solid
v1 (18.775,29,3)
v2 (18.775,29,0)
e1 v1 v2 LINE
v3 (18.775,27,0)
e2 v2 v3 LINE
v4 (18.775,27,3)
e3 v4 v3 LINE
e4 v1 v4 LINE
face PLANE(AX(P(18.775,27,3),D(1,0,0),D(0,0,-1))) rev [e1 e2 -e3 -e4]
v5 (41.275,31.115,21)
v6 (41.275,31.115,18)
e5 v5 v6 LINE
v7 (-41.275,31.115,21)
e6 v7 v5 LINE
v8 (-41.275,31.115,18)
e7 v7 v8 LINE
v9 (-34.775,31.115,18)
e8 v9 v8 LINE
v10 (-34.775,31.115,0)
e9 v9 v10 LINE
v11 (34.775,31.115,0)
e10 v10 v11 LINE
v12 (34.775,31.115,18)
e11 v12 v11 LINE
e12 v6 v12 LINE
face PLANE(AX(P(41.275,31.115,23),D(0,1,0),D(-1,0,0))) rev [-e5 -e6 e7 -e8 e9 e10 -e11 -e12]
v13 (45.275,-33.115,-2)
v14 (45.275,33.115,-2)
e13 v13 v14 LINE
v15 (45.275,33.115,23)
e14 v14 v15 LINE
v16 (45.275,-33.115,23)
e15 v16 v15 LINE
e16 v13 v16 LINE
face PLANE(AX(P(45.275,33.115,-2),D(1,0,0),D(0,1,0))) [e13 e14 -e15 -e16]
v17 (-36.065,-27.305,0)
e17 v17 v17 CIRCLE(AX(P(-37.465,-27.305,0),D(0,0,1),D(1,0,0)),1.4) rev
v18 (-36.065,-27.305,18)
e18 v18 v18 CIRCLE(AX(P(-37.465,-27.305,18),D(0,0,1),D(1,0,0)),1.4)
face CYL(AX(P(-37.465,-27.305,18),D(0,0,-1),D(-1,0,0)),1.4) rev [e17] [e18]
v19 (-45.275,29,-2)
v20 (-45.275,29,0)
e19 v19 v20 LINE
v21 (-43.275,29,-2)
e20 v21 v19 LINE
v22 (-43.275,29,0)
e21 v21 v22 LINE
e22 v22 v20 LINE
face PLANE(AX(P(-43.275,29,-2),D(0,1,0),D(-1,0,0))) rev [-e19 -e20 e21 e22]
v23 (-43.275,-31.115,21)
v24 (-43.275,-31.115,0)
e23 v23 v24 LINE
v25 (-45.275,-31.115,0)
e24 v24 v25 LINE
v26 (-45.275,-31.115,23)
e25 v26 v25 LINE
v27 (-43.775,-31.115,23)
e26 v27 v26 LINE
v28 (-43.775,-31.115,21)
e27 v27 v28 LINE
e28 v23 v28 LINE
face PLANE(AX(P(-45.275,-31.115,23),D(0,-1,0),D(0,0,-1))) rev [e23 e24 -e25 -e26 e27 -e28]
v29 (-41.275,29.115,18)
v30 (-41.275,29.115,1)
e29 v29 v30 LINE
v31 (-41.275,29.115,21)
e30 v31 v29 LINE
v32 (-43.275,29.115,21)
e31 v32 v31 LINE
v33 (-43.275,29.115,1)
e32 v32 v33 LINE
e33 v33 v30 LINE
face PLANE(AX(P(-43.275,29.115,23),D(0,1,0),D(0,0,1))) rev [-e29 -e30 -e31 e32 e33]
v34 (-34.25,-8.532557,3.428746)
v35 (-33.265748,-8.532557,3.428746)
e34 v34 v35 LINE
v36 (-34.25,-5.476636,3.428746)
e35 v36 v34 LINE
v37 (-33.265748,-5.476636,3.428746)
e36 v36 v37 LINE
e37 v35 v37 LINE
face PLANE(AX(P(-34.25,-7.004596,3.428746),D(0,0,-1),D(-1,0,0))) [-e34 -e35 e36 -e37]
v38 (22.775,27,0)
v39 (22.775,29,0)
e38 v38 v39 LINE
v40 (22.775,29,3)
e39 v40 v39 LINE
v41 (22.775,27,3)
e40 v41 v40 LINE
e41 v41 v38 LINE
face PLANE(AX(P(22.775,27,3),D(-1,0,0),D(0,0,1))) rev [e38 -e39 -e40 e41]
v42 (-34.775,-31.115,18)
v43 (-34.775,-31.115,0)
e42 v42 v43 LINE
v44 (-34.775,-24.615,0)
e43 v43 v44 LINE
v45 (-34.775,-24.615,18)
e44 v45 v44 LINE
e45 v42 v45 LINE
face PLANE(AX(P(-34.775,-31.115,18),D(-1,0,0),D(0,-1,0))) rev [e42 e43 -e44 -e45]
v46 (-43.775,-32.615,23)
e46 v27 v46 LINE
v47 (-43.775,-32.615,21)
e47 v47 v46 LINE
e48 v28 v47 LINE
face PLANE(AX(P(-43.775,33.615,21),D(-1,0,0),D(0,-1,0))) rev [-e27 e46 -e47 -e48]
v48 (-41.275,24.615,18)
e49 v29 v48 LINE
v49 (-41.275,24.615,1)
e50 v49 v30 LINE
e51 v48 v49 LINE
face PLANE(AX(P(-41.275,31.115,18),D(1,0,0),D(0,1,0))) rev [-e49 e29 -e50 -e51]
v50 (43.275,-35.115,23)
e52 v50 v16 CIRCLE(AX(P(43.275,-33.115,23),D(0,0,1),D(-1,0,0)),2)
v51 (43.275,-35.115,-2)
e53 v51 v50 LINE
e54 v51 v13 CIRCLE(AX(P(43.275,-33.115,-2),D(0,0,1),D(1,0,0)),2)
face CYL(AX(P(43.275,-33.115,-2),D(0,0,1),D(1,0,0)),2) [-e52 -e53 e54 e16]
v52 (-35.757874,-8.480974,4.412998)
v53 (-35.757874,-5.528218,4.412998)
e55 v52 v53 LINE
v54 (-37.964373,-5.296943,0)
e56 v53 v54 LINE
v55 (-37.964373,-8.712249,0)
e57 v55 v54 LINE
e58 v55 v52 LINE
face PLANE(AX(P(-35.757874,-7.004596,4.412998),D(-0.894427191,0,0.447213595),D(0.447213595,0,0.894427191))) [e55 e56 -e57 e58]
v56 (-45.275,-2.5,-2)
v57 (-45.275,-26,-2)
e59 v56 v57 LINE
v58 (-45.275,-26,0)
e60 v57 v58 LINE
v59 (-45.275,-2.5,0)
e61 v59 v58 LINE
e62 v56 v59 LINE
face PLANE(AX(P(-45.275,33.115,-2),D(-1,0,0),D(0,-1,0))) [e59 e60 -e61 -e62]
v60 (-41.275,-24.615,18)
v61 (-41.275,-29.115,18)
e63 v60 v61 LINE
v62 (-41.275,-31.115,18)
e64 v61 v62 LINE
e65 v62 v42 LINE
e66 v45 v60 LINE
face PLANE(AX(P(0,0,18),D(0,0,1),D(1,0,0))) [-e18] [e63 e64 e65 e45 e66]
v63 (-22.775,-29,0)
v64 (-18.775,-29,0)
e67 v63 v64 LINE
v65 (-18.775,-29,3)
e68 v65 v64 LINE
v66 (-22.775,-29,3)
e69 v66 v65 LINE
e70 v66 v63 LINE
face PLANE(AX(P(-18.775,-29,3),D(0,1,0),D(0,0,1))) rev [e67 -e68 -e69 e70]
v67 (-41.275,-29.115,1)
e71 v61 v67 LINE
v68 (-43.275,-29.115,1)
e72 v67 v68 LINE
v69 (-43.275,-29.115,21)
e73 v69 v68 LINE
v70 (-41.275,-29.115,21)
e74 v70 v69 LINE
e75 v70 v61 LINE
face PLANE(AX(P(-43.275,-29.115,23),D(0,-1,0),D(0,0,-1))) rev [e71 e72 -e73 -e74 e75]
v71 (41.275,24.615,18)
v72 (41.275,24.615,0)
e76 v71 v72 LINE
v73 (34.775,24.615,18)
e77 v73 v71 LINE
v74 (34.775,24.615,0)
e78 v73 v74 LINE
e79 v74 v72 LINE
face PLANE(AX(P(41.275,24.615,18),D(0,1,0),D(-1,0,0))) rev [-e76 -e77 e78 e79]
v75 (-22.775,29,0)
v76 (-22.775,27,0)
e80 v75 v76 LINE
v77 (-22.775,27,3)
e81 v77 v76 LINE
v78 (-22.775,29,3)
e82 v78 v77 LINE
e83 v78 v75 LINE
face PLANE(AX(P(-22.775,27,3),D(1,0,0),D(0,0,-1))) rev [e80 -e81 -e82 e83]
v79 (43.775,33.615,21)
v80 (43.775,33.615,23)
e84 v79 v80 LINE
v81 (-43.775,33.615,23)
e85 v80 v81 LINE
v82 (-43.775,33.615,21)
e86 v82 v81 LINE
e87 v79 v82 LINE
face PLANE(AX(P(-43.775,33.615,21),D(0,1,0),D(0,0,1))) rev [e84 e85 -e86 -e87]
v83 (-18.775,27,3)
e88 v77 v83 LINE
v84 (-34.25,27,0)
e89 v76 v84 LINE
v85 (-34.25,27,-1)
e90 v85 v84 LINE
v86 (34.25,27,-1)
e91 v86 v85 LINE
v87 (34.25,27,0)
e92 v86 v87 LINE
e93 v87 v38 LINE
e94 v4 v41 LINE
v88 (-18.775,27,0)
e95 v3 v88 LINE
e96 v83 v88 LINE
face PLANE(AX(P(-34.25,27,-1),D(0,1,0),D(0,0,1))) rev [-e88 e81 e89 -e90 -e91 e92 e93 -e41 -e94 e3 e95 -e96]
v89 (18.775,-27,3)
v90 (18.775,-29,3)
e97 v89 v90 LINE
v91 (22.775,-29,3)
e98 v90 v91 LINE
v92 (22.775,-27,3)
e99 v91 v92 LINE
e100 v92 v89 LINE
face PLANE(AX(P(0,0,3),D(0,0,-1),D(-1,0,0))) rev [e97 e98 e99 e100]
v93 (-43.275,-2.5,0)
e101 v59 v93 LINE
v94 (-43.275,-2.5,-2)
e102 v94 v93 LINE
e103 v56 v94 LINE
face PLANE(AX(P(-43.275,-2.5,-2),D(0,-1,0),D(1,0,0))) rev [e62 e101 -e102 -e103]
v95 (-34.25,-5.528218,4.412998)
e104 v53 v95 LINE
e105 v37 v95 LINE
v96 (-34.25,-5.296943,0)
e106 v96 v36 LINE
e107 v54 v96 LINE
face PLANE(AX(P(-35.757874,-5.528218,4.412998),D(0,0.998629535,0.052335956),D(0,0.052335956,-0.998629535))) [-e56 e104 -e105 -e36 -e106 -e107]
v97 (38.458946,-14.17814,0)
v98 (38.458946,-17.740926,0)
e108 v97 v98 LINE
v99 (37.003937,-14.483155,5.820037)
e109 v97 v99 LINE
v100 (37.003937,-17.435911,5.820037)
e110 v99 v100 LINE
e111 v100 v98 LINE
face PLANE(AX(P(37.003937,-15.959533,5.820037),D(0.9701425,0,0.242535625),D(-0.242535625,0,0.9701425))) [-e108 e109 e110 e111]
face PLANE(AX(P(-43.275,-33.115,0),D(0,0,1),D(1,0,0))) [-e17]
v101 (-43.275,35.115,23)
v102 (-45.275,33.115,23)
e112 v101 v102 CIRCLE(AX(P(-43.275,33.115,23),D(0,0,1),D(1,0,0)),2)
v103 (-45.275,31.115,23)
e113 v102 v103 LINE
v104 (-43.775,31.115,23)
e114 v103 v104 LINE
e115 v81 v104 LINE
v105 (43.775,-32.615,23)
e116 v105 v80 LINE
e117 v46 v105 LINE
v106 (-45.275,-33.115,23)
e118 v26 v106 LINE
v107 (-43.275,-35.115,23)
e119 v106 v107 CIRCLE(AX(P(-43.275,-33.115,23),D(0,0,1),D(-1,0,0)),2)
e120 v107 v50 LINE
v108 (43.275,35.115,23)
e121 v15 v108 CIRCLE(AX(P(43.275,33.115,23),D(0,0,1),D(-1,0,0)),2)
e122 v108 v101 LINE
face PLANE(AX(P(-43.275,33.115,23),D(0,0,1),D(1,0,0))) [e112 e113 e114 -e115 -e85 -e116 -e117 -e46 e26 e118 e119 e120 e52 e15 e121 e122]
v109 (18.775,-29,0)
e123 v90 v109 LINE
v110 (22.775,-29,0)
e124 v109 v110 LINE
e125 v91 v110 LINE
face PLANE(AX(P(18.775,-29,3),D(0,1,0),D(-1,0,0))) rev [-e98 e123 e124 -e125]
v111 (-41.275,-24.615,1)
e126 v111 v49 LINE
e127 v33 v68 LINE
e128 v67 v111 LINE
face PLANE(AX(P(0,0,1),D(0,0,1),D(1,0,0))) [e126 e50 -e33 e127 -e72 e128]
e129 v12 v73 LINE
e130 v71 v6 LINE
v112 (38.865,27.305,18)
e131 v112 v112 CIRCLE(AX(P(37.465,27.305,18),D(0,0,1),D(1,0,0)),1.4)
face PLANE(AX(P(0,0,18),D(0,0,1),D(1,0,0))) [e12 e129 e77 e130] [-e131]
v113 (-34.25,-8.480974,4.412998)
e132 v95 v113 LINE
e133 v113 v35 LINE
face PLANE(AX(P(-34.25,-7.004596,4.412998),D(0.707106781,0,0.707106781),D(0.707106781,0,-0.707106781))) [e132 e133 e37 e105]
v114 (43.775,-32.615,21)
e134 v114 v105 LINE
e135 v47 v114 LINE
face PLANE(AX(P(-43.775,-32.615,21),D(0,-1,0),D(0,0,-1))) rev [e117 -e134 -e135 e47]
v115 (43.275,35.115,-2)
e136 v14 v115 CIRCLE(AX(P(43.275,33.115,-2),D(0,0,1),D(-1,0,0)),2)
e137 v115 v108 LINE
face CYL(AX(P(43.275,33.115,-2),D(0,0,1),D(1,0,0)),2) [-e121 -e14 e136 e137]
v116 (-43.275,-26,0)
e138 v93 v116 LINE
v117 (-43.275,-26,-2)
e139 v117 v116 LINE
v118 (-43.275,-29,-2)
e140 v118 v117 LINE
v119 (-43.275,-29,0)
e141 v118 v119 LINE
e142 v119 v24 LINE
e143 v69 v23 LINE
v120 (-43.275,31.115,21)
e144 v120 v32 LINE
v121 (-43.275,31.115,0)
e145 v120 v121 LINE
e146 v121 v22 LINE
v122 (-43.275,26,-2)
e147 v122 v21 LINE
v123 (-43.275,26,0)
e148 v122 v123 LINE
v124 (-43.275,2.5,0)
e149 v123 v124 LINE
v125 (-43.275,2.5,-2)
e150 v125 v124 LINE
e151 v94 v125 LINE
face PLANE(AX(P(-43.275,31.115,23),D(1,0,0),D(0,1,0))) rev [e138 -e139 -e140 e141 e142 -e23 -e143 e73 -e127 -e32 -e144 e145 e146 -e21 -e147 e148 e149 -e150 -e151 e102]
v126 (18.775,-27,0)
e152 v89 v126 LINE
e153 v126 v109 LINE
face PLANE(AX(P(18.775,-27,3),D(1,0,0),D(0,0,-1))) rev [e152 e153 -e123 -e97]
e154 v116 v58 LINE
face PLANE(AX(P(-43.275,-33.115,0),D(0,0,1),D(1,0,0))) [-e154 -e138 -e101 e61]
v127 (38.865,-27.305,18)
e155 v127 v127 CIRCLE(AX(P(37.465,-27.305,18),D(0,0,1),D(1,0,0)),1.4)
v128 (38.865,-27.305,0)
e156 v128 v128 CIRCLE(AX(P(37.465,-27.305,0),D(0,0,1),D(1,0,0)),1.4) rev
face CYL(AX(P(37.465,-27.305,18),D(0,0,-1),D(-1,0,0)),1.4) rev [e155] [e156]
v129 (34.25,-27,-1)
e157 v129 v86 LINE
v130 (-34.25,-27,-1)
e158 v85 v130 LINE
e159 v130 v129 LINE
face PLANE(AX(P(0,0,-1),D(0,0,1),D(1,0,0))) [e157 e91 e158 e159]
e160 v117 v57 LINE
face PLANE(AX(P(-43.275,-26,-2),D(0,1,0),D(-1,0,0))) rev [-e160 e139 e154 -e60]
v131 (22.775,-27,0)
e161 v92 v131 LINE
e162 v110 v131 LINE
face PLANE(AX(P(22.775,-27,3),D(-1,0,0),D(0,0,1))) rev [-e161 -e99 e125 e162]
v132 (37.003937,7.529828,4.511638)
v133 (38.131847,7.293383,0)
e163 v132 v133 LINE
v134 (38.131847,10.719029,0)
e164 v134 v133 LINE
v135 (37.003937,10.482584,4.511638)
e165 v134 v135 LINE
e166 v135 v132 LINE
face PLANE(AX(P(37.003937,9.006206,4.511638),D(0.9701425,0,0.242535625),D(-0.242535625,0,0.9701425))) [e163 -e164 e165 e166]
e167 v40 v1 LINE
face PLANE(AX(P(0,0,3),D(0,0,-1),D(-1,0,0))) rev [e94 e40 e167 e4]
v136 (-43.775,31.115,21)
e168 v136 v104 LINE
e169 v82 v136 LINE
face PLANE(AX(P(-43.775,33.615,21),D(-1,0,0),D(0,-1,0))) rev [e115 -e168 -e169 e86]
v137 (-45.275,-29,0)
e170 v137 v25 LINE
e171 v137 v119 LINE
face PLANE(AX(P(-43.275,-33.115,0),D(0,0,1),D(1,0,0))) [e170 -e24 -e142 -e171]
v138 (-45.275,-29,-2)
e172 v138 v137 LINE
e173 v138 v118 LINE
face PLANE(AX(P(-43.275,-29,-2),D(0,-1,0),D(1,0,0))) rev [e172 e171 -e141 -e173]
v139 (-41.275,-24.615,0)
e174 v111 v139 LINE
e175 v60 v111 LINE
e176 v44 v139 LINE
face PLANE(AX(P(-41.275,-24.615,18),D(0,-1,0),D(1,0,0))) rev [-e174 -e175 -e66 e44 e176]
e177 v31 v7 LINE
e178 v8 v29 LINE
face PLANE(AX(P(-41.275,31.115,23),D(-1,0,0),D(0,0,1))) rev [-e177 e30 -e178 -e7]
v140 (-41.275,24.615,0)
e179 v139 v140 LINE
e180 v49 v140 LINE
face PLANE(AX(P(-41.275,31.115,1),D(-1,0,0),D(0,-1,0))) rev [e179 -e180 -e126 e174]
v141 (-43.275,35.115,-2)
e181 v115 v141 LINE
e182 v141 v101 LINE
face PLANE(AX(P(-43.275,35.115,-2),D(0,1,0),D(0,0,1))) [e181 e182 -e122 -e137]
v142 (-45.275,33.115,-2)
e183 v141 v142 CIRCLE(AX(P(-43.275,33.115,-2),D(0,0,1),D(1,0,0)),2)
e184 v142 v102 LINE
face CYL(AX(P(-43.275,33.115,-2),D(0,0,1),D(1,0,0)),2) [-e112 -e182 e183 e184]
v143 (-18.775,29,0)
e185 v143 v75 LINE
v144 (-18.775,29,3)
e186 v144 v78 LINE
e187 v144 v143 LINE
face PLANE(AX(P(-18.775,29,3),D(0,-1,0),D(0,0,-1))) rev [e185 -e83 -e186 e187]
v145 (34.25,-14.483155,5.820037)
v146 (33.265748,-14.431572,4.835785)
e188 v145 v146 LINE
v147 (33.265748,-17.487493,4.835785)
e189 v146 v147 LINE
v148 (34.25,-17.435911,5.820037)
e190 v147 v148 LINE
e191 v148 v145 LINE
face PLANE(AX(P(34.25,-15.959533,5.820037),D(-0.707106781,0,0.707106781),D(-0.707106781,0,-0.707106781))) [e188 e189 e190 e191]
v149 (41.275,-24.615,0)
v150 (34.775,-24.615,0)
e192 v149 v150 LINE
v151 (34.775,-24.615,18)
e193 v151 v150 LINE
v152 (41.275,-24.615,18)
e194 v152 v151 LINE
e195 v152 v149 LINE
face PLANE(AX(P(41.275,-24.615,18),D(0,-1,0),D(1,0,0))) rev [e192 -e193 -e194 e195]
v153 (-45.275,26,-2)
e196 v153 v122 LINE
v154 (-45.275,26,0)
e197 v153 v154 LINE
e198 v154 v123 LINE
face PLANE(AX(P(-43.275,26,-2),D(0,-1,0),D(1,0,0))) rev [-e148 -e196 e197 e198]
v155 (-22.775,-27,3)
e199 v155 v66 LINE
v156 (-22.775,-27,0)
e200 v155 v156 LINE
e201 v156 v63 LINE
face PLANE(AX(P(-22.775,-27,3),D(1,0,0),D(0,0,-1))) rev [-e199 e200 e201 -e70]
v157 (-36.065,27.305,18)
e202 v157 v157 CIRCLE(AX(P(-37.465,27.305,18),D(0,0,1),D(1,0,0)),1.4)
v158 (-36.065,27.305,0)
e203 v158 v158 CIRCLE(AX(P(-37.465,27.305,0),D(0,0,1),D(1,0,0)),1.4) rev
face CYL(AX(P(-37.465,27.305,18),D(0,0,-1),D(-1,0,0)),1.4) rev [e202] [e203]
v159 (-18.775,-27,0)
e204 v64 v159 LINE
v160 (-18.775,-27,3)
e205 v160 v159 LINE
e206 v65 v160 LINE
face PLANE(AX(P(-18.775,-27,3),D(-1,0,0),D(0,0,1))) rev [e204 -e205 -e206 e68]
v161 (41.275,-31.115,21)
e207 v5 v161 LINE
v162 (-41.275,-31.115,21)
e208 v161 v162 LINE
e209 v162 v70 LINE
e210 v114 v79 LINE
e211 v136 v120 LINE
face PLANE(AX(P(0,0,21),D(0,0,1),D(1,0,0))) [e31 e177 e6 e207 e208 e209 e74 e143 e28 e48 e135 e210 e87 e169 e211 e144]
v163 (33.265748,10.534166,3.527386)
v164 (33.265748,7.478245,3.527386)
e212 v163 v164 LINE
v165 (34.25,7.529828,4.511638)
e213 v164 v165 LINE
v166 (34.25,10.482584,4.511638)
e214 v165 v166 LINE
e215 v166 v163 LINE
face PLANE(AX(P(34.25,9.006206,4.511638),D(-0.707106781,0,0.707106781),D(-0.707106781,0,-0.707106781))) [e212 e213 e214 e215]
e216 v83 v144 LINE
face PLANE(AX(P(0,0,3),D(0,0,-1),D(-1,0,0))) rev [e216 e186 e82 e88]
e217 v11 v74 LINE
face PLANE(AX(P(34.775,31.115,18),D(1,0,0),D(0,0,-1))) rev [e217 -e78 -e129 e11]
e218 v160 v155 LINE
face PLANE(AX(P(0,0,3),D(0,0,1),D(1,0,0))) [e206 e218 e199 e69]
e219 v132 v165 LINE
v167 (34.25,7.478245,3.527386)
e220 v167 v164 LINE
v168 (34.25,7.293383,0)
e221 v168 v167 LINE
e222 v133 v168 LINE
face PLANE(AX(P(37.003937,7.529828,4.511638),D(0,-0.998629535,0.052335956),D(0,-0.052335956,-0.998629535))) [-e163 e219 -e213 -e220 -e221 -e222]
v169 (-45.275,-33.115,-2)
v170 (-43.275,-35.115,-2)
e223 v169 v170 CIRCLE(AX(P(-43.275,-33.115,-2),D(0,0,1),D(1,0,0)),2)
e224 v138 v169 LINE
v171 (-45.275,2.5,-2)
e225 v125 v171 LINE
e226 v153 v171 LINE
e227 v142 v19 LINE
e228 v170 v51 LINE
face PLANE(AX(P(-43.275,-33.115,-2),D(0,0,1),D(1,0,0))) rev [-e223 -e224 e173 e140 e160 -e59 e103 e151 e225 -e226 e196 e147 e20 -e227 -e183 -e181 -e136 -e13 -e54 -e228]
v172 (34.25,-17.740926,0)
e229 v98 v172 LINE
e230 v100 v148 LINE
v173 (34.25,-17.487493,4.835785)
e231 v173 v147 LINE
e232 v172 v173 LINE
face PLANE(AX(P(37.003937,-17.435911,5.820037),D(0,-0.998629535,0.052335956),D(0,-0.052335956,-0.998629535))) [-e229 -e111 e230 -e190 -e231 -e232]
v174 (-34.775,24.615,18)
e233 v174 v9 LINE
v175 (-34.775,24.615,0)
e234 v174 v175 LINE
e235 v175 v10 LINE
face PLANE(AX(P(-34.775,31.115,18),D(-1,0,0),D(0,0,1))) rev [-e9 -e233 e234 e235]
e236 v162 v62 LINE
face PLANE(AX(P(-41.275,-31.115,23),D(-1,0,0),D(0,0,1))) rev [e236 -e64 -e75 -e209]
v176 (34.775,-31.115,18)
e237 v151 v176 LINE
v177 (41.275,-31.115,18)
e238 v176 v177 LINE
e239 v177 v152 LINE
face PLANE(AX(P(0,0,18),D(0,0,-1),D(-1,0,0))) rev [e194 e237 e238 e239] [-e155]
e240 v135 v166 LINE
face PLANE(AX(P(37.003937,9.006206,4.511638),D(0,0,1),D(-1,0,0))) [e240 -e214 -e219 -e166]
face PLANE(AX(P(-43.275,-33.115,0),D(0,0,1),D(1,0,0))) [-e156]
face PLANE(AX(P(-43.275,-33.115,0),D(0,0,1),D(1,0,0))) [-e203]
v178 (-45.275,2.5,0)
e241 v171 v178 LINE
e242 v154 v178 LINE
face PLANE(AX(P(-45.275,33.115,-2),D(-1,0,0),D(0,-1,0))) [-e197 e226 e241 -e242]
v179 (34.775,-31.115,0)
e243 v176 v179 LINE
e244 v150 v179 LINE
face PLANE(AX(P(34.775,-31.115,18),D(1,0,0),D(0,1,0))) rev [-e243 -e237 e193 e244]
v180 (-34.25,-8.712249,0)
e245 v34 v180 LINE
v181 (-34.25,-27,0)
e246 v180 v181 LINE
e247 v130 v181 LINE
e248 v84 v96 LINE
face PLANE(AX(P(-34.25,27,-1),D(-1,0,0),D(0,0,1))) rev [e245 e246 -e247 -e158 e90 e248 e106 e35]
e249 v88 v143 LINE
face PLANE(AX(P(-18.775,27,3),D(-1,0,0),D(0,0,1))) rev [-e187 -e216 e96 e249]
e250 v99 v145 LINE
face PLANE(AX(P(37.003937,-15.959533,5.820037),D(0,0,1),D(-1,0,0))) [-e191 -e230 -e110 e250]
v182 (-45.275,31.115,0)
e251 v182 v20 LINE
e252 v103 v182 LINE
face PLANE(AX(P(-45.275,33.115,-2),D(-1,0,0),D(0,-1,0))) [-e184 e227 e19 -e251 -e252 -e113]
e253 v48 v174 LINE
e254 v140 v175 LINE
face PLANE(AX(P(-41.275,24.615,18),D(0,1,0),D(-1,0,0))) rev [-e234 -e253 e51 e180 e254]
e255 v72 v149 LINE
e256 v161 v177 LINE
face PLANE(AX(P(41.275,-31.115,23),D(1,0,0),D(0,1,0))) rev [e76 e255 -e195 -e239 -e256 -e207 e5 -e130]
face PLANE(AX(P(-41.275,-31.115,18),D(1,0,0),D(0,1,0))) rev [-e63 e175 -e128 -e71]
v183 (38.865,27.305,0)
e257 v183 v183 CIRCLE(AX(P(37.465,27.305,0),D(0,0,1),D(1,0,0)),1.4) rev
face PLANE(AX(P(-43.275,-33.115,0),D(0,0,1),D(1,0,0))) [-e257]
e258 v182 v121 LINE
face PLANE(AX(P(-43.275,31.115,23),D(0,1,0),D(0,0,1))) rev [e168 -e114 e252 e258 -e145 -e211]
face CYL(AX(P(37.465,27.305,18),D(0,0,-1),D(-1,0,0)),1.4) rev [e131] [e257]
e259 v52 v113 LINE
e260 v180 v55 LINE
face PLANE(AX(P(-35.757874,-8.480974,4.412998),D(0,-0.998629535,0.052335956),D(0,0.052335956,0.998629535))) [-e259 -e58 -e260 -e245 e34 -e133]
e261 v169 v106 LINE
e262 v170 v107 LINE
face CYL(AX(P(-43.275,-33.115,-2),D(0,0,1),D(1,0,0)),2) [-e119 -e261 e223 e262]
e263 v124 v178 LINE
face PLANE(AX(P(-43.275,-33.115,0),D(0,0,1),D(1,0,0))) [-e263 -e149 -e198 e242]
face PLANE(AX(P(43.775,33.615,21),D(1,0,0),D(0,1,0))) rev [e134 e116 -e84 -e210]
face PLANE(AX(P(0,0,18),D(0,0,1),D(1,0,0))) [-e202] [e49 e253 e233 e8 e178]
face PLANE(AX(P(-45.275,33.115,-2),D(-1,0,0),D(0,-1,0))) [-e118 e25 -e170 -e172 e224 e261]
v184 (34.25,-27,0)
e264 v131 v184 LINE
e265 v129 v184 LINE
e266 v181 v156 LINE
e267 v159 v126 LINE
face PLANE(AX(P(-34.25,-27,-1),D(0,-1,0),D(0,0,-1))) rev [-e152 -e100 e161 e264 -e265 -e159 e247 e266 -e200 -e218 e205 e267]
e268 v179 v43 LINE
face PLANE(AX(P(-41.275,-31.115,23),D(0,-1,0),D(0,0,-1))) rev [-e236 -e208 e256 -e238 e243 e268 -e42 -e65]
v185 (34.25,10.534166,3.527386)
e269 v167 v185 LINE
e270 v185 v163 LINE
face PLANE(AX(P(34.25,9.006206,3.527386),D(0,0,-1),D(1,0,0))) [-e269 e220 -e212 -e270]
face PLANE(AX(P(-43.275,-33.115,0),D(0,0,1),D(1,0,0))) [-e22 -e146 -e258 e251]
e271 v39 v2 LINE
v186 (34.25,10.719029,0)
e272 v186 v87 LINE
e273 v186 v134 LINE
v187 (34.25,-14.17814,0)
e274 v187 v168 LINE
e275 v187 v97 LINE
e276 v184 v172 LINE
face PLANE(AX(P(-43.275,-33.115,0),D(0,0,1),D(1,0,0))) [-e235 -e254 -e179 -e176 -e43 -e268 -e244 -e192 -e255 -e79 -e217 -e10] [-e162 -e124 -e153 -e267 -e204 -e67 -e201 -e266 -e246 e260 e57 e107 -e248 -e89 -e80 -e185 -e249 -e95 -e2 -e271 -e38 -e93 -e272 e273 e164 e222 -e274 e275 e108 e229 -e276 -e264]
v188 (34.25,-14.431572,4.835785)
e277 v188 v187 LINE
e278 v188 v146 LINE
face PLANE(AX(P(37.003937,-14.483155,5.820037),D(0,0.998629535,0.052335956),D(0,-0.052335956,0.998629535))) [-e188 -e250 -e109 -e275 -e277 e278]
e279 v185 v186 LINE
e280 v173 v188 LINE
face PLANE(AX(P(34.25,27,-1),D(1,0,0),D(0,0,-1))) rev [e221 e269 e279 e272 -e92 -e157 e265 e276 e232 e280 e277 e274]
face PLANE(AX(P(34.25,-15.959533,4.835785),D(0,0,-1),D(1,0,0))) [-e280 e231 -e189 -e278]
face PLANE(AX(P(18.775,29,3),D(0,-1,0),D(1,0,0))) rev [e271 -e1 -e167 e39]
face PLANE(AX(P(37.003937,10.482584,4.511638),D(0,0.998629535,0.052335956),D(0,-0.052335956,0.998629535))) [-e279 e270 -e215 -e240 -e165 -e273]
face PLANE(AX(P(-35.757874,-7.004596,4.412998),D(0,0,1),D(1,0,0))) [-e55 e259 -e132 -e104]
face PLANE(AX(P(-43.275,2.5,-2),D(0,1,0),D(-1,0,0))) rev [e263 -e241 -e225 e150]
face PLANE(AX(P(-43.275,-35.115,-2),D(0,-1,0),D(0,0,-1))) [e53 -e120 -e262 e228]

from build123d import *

# Parameters (mm, degrees)
BOSS_EXTRUDE1_DEPTH = 2
SKETCH2_W           = 6.5
SKETCH2_H           = 6.5
SKETCH2_R           = 1.4
BOSS_EXTRUDE2_DEPTH = 18
SKETCH3_W           = 68.5
SKETCH3_H           = 54
CUT_EXTRUDE1_DEPTH  = 1
SNAP_START          = 34.25
SNAP_HOOK1_DEPTH    = 2.753937008
SNAP_START_2        = 7.4782452
SNAP_HOOK1_2_DEPTH  = 3.055920826
SNAP_START_3        = 7.293382709
SNAP_HOOK1_3_DEPTH  = 3.425645808
SNAP_START_4        = 32
SNAP_HOOK1_4_DEPTH  = 7
LPATTERN1_START     = 34.25
LPATTERN1_DEPTH     = 2.753937008
LPATTERN1_START_2   = -17.740925941
LPATTERN1_2_DEPTH   = 3.56278637
LPATTERN1_START_3   = -17.487493169
LPATTERN1_3_DEPTH   = 3.055920826
LPATTERN1_START_4   = 32
LPATTERN1_4_DEPTH   = 7
SNAP_START_5        = -35.757874016
SNAP_HOOK2_DEPTH    = 1.507874016
SNAP_START_6        = -8.712249477
SNAP_HOOK2_2_DEPTH  = 3.415306745
SNAP_START_7        = -8.532556518
SNAP_HOOK2_3_DEPTH  = 3.055920826
SNAP_START_8        = -39
SNAP_HOOK2_4_DEPTH  = 7
BOSS_EXTRUDE3_START = 23
BOSS_EXTRUDE3_DEPTH = 23
SKETCH5_W           = 87.55
SKETCH5_H           = 66.23
CUT_EXTRUDE2_DEPTH  = 2
SKETCH6_W           = 2
SKETCH6_H           = 62.23
BOSS_EXTRUDE4_DEPTH = 1
SKETCH7_W           = 2
SKETCH7_H           = 3
SKETCH7_H_2         = 5
CUT_EXTRUDE3_DEPTH  = 2
SKETCH9_W           = 4
SKETCH9_H           = 2
BOSS_EXTRUDE6_DEPTH = 3


with BuildPart() as part:
    # Sketch1 → Boss-Extrude1 (new body)
    with BuildSketch(Plane.XY):
        with BuildLine():
            Line((-43.275, 35.115), (43.275, 35.115))
            ThreePointArc((43.275, 35.115), (44.689213562, 34.529213562), (45.275, 33.115))
            Line((45.275, 33.115), (45.275, -33.115))
            ThreePointArc((45.275, -33.115), (44.689213562, -34.529213562), (43.275, -35.115))
            Line((43.275, -35.115), (-43.275, -35.115))
            ThreePointArc((-43.275, -35.115), (-44.689213562, -34.529213562), (-45.275, -33.115))
            Line((-45.275, -33.115), (-45.275, 33.115))
            ThreePointArc((-45.275, 33.115), (-44.689213562, 34.529213562), (-43.275, 35.115))
        make_face()
    extrude(amount=-BOSS_EXTRUDE1_DEPTH)

    # Sketch2 → Boss-Extrude2 (add)
    # profile 1 of 4: a face of its own
    with BuildSketch(Plane.XY):
        with Locations((-38.025, -27.865)):
            Rectangle(SKETCH2_W, SKETCH2_H)
        with Locations((-37.465, -27.305)):
            Circle(SKETCH2_R, mode=Mode.SUBTRACT)
    # profile 2 of 4: a face of its own
    with BuildSketch(Plane.XY):
        with Locations((-38.025, 27.865)):
            Rectangle(SKETCH2_W, SKETCH2_H)
        with Locations((-37.465, 27.305)):
            Circle(SKETCH2_R, mode=Mode.SUBTRACT)
    # profile 3 of 4: a face of its own
    with BuildSketch(Plane.XY):
        with Locations((38.025, -27.865)):
            Rectangle(SKETCH2_W, SKETCH2_H)
        with Locations((37.465, -27.305)):
            Circle(SKETCH2_R, mode=Mode.SUBTRACT)
    # profile 4 of 4: a face of its own
    with BuildSketch(Plane.XY):
        with Locations((38.025, 27.865)):
            Rectangle(SKETCH2_W, SKETCH2_H)
        with Locations((37.465, 27.305)):
            Circle(SKETCH2_R, mode=Mode.SUBTRACT)
    extrude(amount=BOSS_EXTRUDE2_DEPTH)

    # Sketch3 → Cut-Extrude1 (cut)
    with BuildSketch(Plane.XY):
        Rectangle(SKETCH3_W, SKETCH3_H)
    extrude(amount=-CUT_EXTRUDE1_DEPTH, mode=Mode.SUBTRACT)

    # Snap Hook1: read off the stored shape, not the designer's step
    # Snap Hook1 outline → Snap Hook1 (add)
    with BuildSketch(Plane.YZ.offset(SNAP_START)):
        Polygon((10.482583566, 4.511638427), (7.52982766, 4.511638427), (7.293382709, 0), (10.719028517, 0), align=None)
    extrude(amount=SNAP_HOOK1_DEPTH)

    # Snap Hook1 2 outline → Snap Hook1 2 (add)
    with BuildSketch(Plane(origin=(0, 0, 0), x_dir=(1, 0, 0), z_dir=(0, 1, 0)).offset(SNAP_START_2)):
        Polygon((34.25, -3.527386458), (33.265748031, -3.527386458), (34.25, -4.511638427), align=None)
        Polygon((38.131846615, 0), (37.003937008, 0), (37.003937008, -4.511638427), align=None)
    extrude(amount=SNAP_HOOK1_2_DEPTH)

    # Snap Hook1 3 outline → Snap Hook1 3 (add)
    with BuildSketch(Plane(origin=(0, 0, 0), x_dir=(1, 0, 0), z_dir=(0, 1, 0)).offset(SNAP_START_3)):
        Polygon((38.131846615, 0), (37.003937008, 0), (37.003937008, -4.511638427), align=None)
    extrude(amount=SNAP_HOOK1_3_DEPTH)

    # Snap Hook1 4 outline → Snap Hook1 4 (cut)
    with BuildSketch(Plane.YZ.offset(SNAP_START_4)):
        Polygon((10.719028517, 0), (10.719028517, 6), (10.404581841, 6), (10.482583566, 4.511638427), align=None)
        Polygon((7.52982766, 4.511638427), (7.607829385, 6), (7.293382709, 6), (7.293382709, 0), align=None)
    extrude(amount=SNAP_HOOK1_4_DEPTH, mode=Mode.SUBTRACT)

    # LPattern1: read off the stored shape, not the designer's step
    # LPattern1 outline → LPattern1 (add)
    with BuildSketch(Plane.YZ.offset(LPATTERN1_START)):
        Polygon((-14.483154803, 5.820037333), (-17.435910709, 5.820037333), (-17.740925941, 0), (-14.178139571, 0), align=None)
    extrude(amount=LPATTERN1_DEPTH)

    # LPattern1 2 outline → LPattern1 2 (add)
    with BuildSketch(Plane(origin=(0, 0, 0), x_dir=(1, 0, 0), z_dir=(0, 1, 0)).offset(LPATTERN1_START_2)):
        Polygon((38.458946341, 0), (37.003937008, 0), (37.003937008, -5.820037333), align=None)
    extrude(amount=LPATTERN1_2_DEPTH)

    # LPattern1 3 outline → LPattern1 3 (add)
    with BuildSketch(Plane(origin=(0, 0, 0), x_dir=(1, 0, 0), z_dir=(0, 1, 0)).offset(LPATTERN1_START_3)):
        Polygon((34.25, -4.835785364), (33.265748031, -4.835785364), (34.25, -5.820037333), align=None)
    extrude(amount=LPATTERN1_3_DEPTH)

    # LPattern1 4 outline → LPattern1 4 (cut)
    with BuildSketch(Plane.YZ.offset(LPATTERN1_START_4)):
        Polygon((-14.178139571, 0), (-14.178139571, 7), (-14.544994026, 7), (-14.483154803, 5.820037333), align=None)
        Polygon((-17.435910709, 5.820037333), (-17.374071486, 7), (-17.740925941, 7), (-17.740925941, 0), align=None)
    extrude(amount=LPATTERN1_4_DEPTH, mode=Mode.SUBTRACT)

    # Snap Hook2: read off the stored shape, not the designer's step
    # Snap Hook2 outline → Snap Hook2 (add)
    with BuildSketch(Plane.YZ.offset(SNAP_START_5)):
        Polygon((-5.528218152, 4.412997898), (-8.480974058, 4.412997898), (-8.712249477, 0), (-5.296942732, 0), align=None)
    extrude(amount=SNAP_HOOK2_DEPTH)

    # Snap Hook2 2 outline → Snap Hook2 2 (add)
    with BuildSketch(Plane(origin=(0, 0, 0), x_dir=(1, 0, 0), z_dir=(0, 1, 0)).offset(SNAP_START_6)):
        Polygon((-35.757874016, -4.412997898), (-35.757874016, 0), (-37.964372965, 0), align=None)
    extrude(amount=SNAP_HOOK2_2_DEPTH)

    # Snap Hook2 3 outline → Snap Hook2 3 (add)
    with BuildSketch(Plane(origin=(0, 0, 0), x_dir=(1, 0, 0), z_dir=(0, 1, 0)).offset(SNAP_START_7)):
        Polygon((-34.25, -3.428745929), (-34.25, -4.412997898), (-33.265748031, -3.428745929), align=None)
    extrude(amount=SNAP_HOOK2_3_DEPTH)

    # Snap Hook2 4 outline → Snap Hook2 4 (cut)
    with BuildSketch(Plane.YZ.offset(SNAP_START_8)):
        Polygon((-8.480974058, 4.412997898), (-8.397802802, 6), (-8.712249477, 6), (-8.712249477, 0), align=None)
        Polygon((-5.611389408, 6), (-5.528218152, 4.412997898), (-5.296942732, 0), (-5.296942732, 6), align=None)
    extrude(amount=SNAP_HOOK2_4_DEPTH, mode=Mode.SUBTRACT)

    # Sketch4 → Boss-Extrude3 (add)
    with BuildSketch(Plane.XY.offset(BOSS_EXTRUDE3_START)):
        with BuildLine():
            Line((-43.275, 35.115), (43.275, 35.115))
            ThreePointArc((43.275, 35.115), (44.689213562, 34.529213562), (45.275, 33.115))
            Line((45.275, 33.115), (45.275, -33.115))
            ThreePointArc((45.275, -33.115), (44.689213562, -34.529213562), (43.275, -35.115))
            Line((43.275, -35.115), (-43.275, -35.115))
            ThreePointArc((-43.275, -35.115), (-44.689213562, -34.529213562), (-45.275, -33.115))
            Line((-45.275, -33.115), (-45.275, -31.115))
            Line((-45.275, -31.115), (-43.275, -31.115))
            Line((-43.275, -31.115), (-43.275, -29.115))
            Line((-43.275, -29.115), (-41.275, -29.115))
            Line((-41.275, -29.115), (-41.275, -31.115))
            Line((-41.275, -31.115), (41.275, -31.115))
            Line((41.275, -31.115), (41.275, 31.115))
            Line((41.275, 31.115), (-41.275, 31.115))
            Line((-41.275, 31.115), (-41.275, 29.115))
            Line((-41.275, 29.115), (-43.275, 29.115))
            Line((-43.275, 29.115), (-43.275, 31.115))
            Line((-43.275, 31.115), (-45.275, 31.115))
            Line((-45.275, 31.115), (-45.275, 33.115))
            ThreePointArc((-45.275, 33.115), (-44.689213562, 34.529213562), (-43.275, 35.115))
        make_face()
    extrude(amount=-BOSS_EXTRUDE3_DEPTH)

    # Sketch5 → Cut-Extrude2 (cut)
    with BuildSketch(Plane.XY.offset(23)):
        with Locations((0, 0.5)):
            Rectangle(SKETCH5_W, SKETCH5_H)
    extrude(amount=-CUT_EXTRUDE2_DEPTH, mode=Mode.SUBTRACT)

    # Sketch6 → Boss-Extrude4 (add)
    with BuildSketch(Plane.XY):
        with Locations((-42.275, 0)):
            Rectangle(SKETCH6_W, SKETCH6_H)
    extrude(amount=BOSS_EXTRUDE4_DEPTH)

    # Sketch7 → Cut-Extrude3 (cut)
    with BuildSketch(Plane.XY):
        with Locations((-44.275, 27.5)):
            Rectangle(SKETCH7_W, SKETCH7_H)
        with Locations((-44.275, -27.5)):
            Rectangle(SKETCH7_W, SKETCH7_H)
        with Locations((-44.275, 0)):
            Rectangle(SKETCH7_W, SKETCH7_H_2)
    extrude(amount=-CUT_EXTRUDE3_DEPTH, mode=Mode.SUBTRACT)

    # Sketch9 → Boss-Extrude6 (add)
    with BuildSketch(Plane.XY):
        with Locations((20.775, 28)):
            Rectangle(SKETCH9_W, SKETCH9_H)
        with Locations((-20.775, 28)):
            Rectangle(SKETCH9_W, SKETCH9_H)
        with Locations((20.775, -28)):
            Rectangle(SKETCH9_W, SKETCH9_H)
        with Locations((-20.775, -28)):
            Rectangle(SKETCH9_W, SKETCH9_H)
    extrude(amount=BOSS_EXTRUDE6_DEPTH)


solid = part.part
